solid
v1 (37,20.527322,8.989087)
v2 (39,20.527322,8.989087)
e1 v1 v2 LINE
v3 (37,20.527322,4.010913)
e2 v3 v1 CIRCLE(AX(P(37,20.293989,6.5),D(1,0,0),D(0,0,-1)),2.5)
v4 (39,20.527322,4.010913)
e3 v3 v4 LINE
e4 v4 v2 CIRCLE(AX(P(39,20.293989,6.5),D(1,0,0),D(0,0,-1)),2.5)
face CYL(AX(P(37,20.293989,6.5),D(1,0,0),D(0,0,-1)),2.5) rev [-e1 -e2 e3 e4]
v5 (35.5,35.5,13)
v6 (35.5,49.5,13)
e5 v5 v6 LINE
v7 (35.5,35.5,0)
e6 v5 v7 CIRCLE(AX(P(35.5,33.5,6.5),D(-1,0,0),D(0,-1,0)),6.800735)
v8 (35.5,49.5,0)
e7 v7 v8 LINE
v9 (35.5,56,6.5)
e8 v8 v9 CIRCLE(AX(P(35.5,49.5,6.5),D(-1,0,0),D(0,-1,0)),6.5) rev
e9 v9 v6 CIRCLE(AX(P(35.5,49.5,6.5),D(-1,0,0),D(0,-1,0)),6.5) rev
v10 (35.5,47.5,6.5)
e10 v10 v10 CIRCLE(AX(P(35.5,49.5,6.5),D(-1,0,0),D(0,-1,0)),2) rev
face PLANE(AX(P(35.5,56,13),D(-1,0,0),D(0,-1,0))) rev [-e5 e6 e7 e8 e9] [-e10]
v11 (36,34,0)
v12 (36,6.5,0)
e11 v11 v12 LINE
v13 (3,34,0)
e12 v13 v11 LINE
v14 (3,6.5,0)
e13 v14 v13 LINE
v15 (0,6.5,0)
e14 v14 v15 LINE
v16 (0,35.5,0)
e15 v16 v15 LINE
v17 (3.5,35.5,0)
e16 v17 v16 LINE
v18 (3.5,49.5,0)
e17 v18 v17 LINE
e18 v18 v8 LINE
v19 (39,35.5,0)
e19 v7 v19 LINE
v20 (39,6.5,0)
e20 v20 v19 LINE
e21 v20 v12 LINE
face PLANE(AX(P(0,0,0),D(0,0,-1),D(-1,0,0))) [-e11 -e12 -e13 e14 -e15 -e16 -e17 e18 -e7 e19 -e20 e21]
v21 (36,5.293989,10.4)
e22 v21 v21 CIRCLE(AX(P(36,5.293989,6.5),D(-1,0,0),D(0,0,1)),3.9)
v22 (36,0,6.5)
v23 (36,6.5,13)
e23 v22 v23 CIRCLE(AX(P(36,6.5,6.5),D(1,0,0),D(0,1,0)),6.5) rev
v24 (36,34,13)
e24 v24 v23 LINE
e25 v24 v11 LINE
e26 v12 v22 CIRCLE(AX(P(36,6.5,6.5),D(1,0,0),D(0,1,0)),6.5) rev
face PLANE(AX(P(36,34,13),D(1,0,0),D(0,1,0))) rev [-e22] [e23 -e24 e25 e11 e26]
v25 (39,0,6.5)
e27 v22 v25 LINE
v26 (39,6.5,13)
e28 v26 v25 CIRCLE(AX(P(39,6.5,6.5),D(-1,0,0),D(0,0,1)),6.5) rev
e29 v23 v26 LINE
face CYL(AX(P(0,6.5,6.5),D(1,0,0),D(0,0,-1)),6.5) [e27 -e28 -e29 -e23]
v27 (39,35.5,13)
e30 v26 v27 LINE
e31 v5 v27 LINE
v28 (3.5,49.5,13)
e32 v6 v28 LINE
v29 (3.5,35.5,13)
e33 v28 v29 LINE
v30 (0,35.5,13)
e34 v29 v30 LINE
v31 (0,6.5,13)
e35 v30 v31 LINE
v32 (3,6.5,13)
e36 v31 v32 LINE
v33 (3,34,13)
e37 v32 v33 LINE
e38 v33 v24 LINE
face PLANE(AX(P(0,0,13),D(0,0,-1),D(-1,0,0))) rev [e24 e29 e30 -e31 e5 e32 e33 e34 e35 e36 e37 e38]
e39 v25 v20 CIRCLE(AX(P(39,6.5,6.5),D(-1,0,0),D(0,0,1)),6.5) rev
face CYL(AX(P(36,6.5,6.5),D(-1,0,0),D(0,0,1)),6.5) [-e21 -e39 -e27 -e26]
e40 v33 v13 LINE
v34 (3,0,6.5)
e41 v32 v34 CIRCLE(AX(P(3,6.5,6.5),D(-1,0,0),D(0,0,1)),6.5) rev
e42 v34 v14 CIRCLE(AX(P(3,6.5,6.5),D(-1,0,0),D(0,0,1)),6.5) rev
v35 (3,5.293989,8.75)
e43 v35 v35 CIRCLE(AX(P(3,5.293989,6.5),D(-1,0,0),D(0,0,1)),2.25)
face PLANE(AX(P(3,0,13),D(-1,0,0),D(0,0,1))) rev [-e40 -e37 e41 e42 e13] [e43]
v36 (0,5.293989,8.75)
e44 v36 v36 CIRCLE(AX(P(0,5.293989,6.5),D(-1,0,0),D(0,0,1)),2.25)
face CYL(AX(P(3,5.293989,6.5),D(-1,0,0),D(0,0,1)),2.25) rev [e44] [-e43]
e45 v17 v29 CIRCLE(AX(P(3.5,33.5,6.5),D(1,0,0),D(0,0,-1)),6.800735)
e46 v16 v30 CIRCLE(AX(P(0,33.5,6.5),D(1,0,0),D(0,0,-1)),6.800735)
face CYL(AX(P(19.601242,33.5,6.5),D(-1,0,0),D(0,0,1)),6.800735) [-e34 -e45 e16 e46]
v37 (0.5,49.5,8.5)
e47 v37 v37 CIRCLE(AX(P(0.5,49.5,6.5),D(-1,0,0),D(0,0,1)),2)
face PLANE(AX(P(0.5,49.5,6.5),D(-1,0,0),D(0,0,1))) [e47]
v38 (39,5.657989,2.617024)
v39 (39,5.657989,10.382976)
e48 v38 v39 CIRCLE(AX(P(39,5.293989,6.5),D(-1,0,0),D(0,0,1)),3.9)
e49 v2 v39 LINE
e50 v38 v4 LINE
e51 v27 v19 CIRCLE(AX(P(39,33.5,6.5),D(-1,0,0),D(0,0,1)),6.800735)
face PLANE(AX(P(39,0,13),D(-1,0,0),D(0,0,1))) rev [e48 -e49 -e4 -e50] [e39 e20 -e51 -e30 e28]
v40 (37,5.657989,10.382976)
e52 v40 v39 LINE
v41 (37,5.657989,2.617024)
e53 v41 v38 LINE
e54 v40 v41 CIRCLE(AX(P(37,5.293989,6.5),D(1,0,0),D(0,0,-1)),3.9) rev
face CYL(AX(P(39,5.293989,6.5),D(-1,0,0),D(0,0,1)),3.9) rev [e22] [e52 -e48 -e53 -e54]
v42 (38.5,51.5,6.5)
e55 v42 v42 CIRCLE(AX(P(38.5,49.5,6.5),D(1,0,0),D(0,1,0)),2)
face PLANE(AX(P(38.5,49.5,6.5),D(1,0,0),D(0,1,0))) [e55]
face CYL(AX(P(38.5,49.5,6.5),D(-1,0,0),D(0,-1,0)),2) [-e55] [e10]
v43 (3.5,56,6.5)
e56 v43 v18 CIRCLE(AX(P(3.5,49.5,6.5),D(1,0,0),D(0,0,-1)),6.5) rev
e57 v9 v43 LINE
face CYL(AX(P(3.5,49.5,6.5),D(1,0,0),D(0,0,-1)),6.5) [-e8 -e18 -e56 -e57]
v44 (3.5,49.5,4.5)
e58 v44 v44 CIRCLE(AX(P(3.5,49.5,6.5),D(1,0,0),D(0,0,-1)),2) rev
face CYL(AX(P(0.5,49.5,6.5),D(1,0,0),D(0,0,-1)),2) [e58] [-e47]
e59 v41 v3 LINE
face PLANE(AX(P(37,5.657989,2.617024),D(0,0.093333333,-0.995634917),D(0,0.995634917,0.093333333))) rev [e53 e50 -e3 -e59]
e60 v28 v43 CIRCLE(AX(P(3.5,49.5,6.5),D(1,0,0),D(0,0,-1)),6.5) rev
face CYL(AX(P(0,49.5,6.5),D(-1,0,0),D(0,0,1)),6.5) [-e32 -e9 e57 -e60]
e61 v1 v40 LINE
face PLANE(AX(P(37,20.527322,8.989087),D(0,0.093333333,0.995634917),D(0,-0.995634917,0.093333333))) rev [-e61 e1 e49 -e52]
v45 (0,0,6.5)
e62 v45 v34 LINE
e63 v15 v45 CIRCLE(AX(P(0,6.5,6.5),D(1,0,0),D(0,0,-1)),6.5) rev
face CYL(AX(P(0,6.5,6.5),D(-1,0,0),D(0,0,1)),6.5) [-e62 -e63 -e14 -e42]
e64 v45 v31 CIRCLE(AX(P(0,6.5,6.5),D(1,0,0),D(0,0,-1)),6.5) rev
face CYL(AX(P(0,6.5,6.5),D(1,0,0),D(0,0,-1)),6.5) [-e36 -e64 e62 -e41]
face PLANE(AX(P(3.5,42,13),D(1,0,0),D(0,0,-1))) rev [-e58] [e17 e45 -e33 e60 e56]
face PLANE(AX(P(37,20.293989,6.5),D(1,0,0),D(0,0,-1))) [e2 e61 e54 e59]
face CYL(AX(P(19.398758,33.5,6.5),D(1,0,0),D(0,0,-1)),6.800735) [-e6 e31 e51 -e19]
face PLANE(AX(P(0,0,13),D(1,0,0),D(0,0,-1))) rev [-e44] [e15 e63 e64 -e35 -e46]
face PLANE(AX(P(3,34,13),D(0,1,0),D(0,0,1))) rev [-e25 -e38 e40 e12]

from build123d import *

# Parameters (mm, degrees)
BOSS_EXTRUDE1_DEPTH = 13
SKETCH2_R           = 2.25
CUT_EXTRUDE1_DEPTH  = 3
SKETCH3_R           = 2
BOSS_EXTRUDE2_DEPTH = 3
BOSS_EXTRUDE3_START = 3
SKETCH4_R           = 2
BOSS_EXTRUDE3_DEPTH = 3
CUT_EXTRUDE2_DEPTH  = 3.5
CUT_EXTRUDE3_START  = -3.5
CUT_EXTRUDE3_DEPTH  = 3.5
FILLET1_R           = 6.5
FILLET2_R           = 6.5
SKETCH7_R           = 3.9
CUT_EXTRUDE4_DEPTH  = 68.830671528
CUT_EXTRUDE5_START  = -2
CUT_EXTRUDE5_DEPTH  = 2


with BuildPart() as part:
    # Sketch1 → Boss-Extrude1 (new body)
    with BuildSketch(Plane.XY):
        Polygon((3, 0), (3, 34), (36, 34), (36, 0), (39, 0), (39, 42), (35.5, 42), (35.5, 56), (3.5, 56), (3.5, 42), (0, 42), (0, 0), align=None)
    extrude(amount=BOSS_EXTRUDE1_DEPTH)

    # Sketch2 → Cut-Extrude1 (cut)
    with BuildSketch(Plane.ZY):
        with Locations((6.5, 5.293988539)):
            Circle(SKETCH2_R)
    extrude(amount=-CUT_EXTRUDE1_DEPTH, mode=Mode.SUBTRACT)

    # Sketch3 → Boss-Extrude2 (add)
    with BuildSketch(Plane.ZY.offset(-3.5)):
        with Locations(Location((6.5, 49.5, 0), (0, 0, 180))):
            Circle(SKETCH3_R)
    extrude(amount=BOSS_EXTRUDE2_DEPTH)

    # Sketch4 → Boss-Extrude3 (add)
    with BuildSketch(Plane(origin=(35.5, 0, 0), x_dir=(0, 0, -1), z_dir=(1, 0, 0)).offset(BOSS_EXTRUDE3_START)):
        with Locations((-6.5, 49.5)):
            Circle(SKETCH4_R)
    extrude(amount=-BOSS_EXTRUDE3_DEPTH)

    # Sketch5 → Cut-Extrude2 (cut)
    with BuildSketch(Plane(origin=(39, 0, 0), x_dir=(0, 0, -1), z_dir=(1, 0, 0))):
        with BuildLine():
            Line((0, 35.5), (0, 45))
            Line((0, 45), (-13, 45))
            Line((-13, 45), (-13, 35.5))
            ThreePointArc((-13, 35.5), (-6.5, 40.300735254), (0, 35.5))
        make_face()
    extrude(amount=-CUT_EXTRUDE2_DEPTH, mode=Mode.SUBTRACT)

    # Sketch6 → Cut-Extrude3 (cut)
    with BuildSketch(Plane.ZY.offset(CUT_EXTRUDE3_START)):
        with BuildLine():
            Line((13, 35.5), (13, 45))
            Line((13, 45), (0, 45))
            Line((0, 45), (0, 35.5))
            ThreePointArc((0, 35.5), (6.5, 40.300735254), (13, 35.5))
        make_face()
    extrude(amount=CUT_EXTRUDE3_DEPTH, mode=Mode.SUBTRACT)

    # Fillet1
    fillet1_edges = [part.edges().sort_by_distance(p)[0] for p in [
        (19.5, 56, 13),
        (19.5, 56, 0),
    ]]
    fillet(fillet1_edges, radius=FILLET1_R - 0.0001)  # a hair under: the kernel refuses the full size

    # Fillet2
    fillet2_edges = [part.edges().sort_by_distance(p)[0] for p in [
        (37.5, 0, 13),
        (37.5, 0, 0),
        (1.5, 0, 13),
        (1.5, 0, 0),
    ]]
    fillet(fillet2_edges, radius=FILLET2_R - 0.0001)  # a hair under: the kernel refuses the full size

    # Sketch7 → Cut-Extrude4 (cut, through all)
    with BuildSketch(Plane.ZY.offset(-36)):
        with Locations((6.5, 5.293988539)):
            Circle(SKETCH7_R)
    extrude(amount=-CUT_EXTRUDE4_DEPTH, mode=Mode.SUBTRACT)

    # Sketch8 → Cut-Extrude5 (cut)
    with BuildSketch(Plane(origin=(39, 0, 0), x_dir=(0, 0, -1), z_dir=(1, 0, 0)).offset(CUT_EXTRUDE5_START)):
        with BuildLine():
            Line((-8.989087294, 20.527321872), (-10.382976178, 5.657988539))
            ThreePointArc((-10.382976178, 5.657988539), (-6.5, 1.393988539), (-2.617023822, 5.657988539))
            Line((-2.617023822, 5.657988539), (-4.010912706, 20.527321872))
            ThreePointArc((-4.010912706, 20.527321872), (-6.5, 22.793988539), (-8.989087294, 20.527321872))
        make_face()
    extrude(amount=CUT_EXTRUDE5_DEPTH, mode=Mode.SUBTRACT)


solid = part.part
